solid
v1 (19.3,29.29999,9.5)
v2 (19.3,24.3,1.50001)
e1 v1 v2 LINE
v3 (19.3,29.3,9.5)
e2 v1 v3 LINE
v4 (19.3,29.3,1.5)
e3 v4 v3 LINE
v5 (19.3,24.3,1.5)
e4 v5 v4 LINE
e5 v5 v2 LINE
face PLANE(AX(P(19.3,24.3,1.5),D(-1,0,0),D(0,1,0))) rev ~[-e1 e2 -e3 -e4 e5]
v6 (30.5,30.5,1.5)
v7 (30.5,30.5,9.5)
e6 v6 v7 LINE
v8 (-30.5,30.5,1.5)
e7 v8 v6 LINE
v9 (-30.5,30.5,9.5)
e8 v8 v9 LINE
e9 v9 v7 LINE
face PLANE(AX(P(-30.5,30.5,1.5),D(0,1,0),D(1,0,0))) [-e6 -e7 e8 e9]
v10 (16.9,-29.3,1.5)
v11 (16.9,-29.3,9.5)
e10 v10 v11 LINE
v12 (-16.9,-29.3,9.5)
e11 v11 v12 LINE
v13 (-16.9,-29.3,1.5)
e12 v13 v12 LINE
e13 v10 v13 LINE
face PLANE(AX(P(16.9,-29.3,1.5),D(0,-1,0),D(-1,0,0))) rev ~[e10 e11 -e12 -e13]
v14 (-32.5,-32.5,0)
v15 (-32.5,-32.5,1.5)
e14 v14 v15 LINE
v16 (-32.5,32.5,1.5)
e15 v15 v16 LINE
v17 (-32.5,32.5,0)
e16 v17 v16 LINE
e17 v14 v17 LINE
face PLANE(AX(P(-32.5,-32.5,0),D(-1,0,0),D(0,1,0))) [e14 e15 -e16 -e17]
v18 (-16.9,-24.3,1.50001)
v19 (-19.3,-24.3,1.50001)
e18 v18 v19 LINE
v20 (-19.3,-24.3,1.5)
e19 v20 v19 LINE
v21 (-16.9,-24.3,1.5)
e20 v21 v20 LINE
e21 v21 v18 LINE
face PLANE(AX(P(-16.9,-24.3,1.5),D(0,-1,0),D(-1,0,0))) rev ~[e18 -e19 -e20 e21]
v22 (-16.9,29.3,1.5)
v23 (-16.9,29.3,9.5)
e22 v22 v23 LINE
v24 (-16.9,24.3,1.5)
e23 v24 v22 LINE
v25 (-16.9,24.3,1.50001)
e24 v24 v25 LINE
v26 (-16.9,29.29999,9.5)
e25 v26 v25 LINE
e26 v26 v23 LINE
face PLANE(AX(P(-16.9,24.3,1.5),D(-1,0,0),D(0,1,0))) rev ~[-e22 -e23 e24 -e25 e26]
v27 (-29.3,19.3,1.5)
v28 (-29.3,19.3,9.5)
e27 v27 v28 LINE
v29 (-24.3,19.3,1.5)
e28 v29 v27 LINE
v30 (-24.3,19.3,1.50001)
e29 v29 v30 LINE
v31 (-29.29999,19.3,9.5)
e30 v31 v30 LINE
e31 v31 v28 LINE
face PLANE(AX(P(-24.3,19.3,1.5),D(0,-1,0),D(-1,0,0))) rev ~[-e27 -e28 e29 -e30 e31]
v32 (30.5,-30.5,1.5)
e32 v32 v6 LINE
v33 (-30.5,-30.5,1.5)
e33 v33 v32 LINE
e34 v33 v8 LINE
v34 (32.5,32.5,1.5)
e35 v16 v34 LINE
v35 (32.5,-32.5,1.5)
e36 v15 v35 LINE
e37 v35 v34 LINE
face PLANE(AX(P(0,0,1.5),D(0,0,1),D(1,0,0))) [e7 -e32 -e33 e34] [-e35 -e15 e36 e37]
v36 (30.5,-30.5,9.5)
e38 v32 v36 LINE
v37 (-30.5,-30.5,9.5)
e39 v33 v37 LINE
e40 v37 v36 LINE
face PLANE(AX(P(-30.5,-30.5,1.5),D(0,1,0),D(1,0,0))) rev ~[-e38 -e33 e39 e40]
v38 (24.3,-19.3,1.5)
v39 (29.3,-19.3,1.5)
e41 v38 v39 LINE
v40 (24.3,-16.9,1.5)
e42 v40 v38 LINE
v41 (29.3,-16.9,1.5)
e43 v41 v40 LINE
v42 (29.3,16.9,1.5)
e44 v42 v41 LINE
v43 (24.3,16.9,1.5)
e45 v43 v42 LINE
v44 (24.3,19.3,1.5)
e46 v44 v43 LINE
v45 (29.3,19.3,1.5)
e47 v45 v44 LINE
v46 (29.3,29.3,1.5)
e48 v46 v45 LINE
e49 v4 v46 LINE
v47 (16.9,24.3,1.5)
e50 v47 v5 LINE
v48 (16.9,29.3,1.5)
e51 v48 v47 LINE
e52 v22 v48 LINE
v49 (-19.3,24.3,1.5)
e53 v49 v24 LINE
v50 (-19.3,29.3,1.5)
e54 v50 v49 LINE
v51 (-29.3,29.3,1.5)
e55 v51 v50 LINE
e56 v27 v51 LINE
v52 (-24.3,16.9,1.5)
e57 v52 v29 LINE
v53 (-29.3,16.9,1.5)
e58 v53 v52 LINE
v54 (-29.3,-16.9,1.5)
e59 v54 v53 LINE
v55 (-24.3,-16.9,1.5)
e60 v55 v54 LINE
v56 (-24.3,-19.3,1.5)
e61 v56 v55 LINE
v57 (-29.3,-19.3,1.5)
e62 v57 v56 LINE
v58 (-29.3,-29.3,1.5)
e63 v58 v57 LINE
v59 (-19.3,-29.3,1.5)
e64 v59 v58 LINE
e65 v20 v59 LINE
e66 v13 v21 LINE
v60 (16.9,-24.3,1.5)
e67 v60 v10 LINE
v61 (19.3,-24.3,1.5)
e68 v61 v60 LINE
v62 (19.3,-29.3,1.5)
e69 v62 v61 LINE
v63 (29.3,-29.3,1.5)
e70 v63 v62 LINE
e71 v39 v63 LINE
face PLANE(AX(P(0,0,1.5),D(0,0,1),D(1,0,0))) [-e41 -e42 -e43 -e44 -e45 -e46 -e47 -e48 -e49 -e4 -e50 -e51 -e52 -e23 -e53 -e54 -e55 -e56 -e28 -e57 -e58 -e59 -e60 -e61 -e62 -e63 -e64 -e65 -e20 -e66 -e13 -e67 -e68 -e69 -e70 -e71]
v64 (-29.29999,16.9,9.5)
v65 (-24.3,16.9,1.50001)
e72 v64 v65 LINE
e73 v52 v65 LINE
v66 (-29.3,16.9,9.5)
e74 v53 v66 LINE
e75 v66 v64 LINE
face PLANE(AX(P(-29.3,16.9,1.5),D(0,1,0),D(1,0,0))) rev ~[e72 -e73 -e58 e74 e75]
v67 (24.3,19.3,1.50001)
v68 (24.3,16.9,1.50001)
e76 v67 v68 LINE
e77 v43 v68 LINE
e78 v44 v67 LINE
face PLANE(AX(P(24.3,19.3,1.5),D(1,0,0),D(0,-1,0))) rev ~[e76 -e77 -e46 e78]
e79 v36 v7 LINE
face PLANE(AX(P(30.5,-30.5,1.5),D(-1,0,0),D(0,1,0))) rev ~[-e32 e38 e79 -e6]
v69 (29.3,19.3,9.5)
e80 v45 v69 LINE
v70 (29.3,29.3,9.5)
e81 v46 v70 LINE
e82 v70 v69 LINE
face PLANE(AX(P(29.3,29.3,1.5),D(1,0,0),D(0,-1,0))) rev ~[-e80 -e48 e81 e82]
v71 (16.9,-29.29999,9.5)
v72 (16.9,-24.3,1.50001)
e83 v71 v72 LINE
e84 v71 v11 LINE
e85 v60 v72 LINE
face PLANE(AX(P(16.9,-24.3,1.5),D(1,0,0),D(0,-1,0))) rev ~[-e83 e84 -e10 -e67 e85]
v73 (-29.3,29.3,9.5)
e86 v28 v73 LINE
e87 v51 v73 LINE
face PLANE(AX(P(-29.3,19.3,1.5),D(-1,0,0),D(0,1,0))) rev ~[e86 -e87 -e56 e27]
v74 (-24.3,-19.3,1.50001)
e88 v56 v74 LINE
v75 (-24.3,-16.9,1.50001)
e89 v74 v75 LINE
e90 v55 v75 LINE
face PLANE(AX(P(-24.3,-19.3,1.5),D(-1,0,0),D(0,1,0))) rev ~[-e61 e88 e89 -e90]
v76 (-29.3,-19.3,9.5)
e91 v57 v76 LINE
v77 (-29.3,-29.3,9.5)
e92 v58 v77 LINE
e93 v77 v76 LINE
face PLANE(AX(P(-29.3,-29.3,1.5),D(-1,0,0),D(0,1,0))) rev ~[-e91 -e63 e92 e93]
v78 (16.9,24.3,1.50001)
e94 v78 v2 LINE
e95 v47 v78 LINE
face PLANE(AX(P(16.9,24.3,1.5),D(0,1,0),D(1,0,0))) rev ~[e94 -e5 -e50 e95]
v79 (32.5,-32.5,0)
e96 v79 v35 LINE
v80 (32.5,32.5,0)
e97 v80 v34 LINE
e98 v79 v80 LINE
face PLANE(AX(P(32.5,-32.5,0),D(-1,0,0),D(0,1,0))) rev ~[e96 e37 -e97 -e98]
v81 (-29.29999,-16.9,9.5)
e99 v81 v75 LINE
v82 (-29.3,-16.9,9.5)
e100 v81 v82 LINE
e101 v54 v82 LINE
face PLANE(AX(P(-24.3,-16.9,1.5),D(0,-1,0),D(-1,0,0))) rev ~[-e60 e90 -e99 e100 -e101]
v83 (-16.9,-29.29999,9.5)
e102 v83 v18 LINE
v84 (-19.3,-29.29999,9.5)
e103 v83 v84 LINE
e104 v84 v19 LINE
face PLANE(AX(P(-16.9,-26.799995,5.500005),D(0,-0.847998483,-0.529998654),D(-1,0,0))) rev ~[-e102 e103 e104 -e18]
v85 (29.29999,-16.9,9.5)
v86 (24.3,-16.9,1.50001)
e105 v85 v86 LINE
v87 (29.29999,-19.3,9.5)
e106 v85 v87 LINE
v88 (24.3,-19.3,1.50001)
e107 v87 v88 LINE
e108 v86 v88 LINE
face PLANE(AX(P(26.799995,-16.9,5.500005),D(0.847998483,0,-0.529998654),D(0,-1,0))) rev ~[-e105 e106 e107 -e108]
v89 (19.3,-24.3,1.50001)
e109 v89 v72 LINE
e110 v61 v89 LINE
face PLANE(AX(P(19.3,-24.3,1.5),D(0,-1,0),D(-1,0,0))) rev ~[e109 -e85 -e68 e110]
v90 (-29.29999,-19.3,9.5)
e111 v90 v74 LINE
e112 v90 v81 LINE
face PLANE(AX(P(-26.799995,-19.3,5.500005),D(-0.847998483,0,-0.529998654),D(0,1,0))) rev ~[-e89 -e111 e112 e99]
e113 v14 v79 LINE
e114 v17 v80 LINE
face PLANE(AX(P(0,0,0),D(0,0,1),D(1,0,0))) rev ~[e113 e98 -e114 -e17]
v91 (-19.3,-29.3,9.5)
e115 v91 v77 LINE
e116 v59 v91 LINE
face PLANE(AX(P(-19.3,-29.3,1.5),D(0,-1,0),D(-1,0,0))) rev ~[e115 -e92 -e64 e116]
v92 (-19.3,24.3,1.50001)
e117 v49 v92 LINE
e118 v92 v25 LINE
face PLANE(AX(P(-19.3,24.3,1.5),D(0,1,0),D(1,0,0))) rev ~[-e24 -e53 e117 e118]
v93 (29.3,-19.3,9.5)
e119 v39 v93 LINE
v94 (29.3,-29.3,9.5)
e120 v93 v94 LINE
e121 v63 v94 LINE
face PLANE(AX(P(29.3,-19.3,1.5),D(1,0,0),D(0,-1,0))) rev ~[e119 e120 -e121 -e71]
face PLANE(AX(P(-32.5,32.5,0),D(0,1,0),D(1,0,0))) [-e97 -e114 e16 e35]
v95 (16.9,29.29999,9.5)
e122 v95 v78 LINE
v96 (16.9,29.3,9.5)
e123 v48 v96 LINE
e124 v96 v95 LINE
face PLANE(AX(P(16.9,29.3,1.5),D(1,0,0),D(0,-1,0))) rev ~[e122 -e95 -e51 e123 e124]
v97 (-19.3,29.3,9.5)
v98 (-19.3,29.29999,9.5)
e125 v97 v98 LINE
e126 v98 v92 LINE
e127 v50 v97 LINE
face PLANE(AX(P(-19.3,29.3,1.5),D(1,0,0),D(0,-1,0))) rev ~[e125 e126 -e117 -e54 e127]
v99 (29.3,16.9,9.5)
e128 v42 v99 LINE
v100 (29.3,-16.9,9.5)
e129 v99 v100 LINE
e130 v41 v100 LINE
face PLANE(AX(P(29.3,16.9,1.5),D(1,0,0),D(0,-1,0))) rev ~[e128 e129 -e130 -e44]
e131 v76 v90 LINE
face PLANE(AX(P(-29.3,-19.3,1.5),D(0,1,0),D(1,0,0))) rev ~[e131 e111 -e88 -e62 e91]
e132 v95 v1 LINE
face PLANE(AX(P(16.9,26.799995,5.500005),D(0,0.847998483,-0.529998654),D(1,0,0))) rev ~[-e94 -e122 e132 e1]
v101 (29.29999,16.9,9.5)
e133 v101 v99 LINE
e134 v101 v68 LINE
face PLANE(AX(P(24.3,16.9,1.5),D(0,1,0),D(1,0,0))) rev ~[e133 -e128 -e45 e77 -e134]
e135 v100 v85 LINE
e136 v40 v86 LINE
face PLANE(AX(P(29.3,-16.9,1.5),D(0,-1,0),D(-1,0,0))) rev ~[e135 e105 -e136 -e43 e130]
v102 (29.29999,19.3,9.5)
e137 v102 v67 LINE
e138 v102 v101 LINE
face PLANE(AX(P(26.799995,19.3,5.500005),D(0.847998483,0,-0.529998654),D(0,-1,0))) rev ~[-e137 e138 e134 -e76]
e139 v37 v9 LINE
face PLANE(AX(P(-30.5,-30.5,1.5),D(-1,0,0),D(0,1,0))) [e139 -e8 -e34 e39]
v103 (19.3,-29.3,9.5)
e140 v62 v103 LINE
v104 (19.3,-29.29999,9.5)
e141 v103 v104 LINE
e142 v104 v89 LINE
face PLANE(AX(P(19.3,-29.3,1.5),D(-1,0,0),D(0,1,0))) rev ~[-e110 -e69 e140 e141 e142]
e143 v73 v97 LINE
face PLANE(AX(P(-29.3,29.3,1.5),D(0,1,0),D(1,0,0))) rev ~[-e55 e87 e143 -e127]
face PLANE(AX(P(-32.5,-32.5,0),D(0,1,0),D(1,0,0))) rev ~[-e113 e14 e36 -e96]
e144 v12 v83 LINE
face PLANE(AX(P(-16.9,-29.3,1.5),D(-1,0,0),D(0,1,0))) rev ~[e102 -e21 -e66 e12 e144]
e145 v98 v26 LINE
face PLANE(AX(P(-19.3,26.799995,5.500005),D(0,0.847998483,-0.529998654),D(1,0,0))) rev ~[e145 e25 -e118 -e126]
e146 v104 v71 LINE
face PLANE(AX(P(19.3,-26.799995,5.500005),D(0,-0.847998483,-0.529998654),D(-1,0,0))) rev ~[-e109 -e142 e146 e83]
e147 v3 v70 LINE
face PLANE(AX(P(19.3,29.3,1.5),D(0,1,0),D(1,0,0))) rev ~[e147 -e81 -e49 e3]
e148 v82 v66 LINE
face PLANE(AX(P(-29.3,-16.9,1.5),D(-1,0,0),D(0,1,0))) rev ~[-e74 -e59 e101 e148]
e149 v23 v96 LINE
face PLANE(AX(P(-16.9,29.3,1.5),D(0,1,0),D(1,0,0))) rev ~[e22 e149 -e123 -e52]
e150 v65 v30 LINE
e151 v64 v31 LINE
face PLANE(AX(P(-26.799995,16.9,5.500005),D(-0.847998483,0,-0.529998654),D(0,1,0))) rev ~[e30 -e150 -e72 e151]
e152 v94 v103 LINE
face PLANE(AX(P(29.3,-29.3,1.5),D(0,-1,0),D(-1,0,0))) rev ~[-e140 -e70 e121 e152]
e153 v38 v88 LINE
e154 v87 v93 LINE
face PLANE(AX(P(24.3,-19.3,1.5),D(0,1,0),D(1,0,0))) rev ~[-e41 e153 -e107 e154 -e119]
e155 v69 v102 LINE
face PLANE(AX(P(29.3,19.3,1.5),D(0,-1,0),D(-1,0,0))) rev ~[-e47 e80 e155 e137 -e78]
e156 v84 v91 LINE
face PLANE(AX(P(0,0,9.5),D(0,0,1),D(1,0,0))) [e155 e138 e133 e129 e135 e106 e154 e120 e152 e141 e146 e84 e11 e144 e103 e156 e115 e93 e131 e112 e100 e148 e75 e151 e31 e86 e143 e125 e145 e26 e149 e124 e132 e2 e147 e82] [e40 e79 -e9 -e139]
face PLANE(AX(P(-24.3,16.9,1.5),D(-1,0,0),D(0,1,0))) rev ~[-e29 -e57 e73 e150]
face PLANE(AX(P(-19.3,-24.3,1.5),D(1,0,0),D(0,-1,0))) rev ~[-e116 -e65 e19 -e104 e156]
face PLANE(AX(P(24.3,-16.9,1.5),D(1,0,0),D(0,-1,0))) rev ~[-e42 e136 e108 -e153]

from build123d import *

# Parameters (mm, degrees)
F0_W     = 65
F0_H     = 65
F1_DEPTH = 1.5
F2_W     = 61
F2_H     = 61
F3_DEPTH = 8
F4_SIZE2 = 7.99999
F4_SIZE  = 4.99999


# Not quite as in the source:
# - a fillet or chamfer is up to 0.001 mm smaller than in the source, because OpenCascade refuses the exact size


with BuildPart() as f1:
    # F0 (on Top) → F1 (new body)
    with BuildSketch(Plane.XY):
        Rectangle(F0_W, F0_H)
    extrude(amount=F1_DEPTH)

    # F2 (on face) → F3 (join)
    with BuildSketch(Plane.XY.offset(1.5)):
        Rectangle(F2_W, F2_H)
        Polygon((-29.3, 19.3), (-29.3, 29.3), (-19.3, 29.3), (-19.3, 24.3), (-16.9, 24.3), (-16.9, 29.3), (16.9, 29.3), (16.9, 24.3), (19.3, 24.3), (19.3, 29.3), (29.3, 29.3), (29.3, 19.3), (24.3, 19.3), (24.3, 16.9), (29.3, 16.9), (29.3, -16.9), (24.3, -16.9), (24.3, -19.3), (29.3, -19.3), (29.3, -29.3), (19.3, -29.3), (19.3, -24.3), (16.9, -24.3), (16.9, -29.3), (-16.9, -29.3), (-16.9, -24.3), (-19.3, -24.3), (-19.3, -29.3), (-29.3, -29.3), (-29.3, -19.3), (-24.3, -19.3), (-24.3, -16.9), (-29.3, -16.9), (-29.3, 16.9), (-24.3, 16.9), (-24.3, 19.3), align=None, mode=Mode.SUBTRACT)
    extrude(amount=F3_DEPTH)

    # F4 (size 5 and 8 in the source; OpenCascade refuses exactly that, so slightly less here)
    f4_edges = [f1.edges().sort_by_distance(p)[0] for p in [
        (-24.3, 18.1, 9.5),
        (-18.1, 24.3, 9.5),
        (18.1, 24.3, 9.5),
        (24.3, 18.1, 9.5),
        (-18.1, -24.3, 9.5),
        (-24.3, -18.1, 9.5),
        (18.1, -24.3, 9.5),
        (24.3, -18.1, 9.5),
    ]]
    f4_side = f1.faces().sort_by_distance((0, 29.63733, 9.5))[0]
    chamfer(f4_edges, length=F4_SIZE, length2=F4_SIZE2, reference=f4_side)


solid = f1.part
